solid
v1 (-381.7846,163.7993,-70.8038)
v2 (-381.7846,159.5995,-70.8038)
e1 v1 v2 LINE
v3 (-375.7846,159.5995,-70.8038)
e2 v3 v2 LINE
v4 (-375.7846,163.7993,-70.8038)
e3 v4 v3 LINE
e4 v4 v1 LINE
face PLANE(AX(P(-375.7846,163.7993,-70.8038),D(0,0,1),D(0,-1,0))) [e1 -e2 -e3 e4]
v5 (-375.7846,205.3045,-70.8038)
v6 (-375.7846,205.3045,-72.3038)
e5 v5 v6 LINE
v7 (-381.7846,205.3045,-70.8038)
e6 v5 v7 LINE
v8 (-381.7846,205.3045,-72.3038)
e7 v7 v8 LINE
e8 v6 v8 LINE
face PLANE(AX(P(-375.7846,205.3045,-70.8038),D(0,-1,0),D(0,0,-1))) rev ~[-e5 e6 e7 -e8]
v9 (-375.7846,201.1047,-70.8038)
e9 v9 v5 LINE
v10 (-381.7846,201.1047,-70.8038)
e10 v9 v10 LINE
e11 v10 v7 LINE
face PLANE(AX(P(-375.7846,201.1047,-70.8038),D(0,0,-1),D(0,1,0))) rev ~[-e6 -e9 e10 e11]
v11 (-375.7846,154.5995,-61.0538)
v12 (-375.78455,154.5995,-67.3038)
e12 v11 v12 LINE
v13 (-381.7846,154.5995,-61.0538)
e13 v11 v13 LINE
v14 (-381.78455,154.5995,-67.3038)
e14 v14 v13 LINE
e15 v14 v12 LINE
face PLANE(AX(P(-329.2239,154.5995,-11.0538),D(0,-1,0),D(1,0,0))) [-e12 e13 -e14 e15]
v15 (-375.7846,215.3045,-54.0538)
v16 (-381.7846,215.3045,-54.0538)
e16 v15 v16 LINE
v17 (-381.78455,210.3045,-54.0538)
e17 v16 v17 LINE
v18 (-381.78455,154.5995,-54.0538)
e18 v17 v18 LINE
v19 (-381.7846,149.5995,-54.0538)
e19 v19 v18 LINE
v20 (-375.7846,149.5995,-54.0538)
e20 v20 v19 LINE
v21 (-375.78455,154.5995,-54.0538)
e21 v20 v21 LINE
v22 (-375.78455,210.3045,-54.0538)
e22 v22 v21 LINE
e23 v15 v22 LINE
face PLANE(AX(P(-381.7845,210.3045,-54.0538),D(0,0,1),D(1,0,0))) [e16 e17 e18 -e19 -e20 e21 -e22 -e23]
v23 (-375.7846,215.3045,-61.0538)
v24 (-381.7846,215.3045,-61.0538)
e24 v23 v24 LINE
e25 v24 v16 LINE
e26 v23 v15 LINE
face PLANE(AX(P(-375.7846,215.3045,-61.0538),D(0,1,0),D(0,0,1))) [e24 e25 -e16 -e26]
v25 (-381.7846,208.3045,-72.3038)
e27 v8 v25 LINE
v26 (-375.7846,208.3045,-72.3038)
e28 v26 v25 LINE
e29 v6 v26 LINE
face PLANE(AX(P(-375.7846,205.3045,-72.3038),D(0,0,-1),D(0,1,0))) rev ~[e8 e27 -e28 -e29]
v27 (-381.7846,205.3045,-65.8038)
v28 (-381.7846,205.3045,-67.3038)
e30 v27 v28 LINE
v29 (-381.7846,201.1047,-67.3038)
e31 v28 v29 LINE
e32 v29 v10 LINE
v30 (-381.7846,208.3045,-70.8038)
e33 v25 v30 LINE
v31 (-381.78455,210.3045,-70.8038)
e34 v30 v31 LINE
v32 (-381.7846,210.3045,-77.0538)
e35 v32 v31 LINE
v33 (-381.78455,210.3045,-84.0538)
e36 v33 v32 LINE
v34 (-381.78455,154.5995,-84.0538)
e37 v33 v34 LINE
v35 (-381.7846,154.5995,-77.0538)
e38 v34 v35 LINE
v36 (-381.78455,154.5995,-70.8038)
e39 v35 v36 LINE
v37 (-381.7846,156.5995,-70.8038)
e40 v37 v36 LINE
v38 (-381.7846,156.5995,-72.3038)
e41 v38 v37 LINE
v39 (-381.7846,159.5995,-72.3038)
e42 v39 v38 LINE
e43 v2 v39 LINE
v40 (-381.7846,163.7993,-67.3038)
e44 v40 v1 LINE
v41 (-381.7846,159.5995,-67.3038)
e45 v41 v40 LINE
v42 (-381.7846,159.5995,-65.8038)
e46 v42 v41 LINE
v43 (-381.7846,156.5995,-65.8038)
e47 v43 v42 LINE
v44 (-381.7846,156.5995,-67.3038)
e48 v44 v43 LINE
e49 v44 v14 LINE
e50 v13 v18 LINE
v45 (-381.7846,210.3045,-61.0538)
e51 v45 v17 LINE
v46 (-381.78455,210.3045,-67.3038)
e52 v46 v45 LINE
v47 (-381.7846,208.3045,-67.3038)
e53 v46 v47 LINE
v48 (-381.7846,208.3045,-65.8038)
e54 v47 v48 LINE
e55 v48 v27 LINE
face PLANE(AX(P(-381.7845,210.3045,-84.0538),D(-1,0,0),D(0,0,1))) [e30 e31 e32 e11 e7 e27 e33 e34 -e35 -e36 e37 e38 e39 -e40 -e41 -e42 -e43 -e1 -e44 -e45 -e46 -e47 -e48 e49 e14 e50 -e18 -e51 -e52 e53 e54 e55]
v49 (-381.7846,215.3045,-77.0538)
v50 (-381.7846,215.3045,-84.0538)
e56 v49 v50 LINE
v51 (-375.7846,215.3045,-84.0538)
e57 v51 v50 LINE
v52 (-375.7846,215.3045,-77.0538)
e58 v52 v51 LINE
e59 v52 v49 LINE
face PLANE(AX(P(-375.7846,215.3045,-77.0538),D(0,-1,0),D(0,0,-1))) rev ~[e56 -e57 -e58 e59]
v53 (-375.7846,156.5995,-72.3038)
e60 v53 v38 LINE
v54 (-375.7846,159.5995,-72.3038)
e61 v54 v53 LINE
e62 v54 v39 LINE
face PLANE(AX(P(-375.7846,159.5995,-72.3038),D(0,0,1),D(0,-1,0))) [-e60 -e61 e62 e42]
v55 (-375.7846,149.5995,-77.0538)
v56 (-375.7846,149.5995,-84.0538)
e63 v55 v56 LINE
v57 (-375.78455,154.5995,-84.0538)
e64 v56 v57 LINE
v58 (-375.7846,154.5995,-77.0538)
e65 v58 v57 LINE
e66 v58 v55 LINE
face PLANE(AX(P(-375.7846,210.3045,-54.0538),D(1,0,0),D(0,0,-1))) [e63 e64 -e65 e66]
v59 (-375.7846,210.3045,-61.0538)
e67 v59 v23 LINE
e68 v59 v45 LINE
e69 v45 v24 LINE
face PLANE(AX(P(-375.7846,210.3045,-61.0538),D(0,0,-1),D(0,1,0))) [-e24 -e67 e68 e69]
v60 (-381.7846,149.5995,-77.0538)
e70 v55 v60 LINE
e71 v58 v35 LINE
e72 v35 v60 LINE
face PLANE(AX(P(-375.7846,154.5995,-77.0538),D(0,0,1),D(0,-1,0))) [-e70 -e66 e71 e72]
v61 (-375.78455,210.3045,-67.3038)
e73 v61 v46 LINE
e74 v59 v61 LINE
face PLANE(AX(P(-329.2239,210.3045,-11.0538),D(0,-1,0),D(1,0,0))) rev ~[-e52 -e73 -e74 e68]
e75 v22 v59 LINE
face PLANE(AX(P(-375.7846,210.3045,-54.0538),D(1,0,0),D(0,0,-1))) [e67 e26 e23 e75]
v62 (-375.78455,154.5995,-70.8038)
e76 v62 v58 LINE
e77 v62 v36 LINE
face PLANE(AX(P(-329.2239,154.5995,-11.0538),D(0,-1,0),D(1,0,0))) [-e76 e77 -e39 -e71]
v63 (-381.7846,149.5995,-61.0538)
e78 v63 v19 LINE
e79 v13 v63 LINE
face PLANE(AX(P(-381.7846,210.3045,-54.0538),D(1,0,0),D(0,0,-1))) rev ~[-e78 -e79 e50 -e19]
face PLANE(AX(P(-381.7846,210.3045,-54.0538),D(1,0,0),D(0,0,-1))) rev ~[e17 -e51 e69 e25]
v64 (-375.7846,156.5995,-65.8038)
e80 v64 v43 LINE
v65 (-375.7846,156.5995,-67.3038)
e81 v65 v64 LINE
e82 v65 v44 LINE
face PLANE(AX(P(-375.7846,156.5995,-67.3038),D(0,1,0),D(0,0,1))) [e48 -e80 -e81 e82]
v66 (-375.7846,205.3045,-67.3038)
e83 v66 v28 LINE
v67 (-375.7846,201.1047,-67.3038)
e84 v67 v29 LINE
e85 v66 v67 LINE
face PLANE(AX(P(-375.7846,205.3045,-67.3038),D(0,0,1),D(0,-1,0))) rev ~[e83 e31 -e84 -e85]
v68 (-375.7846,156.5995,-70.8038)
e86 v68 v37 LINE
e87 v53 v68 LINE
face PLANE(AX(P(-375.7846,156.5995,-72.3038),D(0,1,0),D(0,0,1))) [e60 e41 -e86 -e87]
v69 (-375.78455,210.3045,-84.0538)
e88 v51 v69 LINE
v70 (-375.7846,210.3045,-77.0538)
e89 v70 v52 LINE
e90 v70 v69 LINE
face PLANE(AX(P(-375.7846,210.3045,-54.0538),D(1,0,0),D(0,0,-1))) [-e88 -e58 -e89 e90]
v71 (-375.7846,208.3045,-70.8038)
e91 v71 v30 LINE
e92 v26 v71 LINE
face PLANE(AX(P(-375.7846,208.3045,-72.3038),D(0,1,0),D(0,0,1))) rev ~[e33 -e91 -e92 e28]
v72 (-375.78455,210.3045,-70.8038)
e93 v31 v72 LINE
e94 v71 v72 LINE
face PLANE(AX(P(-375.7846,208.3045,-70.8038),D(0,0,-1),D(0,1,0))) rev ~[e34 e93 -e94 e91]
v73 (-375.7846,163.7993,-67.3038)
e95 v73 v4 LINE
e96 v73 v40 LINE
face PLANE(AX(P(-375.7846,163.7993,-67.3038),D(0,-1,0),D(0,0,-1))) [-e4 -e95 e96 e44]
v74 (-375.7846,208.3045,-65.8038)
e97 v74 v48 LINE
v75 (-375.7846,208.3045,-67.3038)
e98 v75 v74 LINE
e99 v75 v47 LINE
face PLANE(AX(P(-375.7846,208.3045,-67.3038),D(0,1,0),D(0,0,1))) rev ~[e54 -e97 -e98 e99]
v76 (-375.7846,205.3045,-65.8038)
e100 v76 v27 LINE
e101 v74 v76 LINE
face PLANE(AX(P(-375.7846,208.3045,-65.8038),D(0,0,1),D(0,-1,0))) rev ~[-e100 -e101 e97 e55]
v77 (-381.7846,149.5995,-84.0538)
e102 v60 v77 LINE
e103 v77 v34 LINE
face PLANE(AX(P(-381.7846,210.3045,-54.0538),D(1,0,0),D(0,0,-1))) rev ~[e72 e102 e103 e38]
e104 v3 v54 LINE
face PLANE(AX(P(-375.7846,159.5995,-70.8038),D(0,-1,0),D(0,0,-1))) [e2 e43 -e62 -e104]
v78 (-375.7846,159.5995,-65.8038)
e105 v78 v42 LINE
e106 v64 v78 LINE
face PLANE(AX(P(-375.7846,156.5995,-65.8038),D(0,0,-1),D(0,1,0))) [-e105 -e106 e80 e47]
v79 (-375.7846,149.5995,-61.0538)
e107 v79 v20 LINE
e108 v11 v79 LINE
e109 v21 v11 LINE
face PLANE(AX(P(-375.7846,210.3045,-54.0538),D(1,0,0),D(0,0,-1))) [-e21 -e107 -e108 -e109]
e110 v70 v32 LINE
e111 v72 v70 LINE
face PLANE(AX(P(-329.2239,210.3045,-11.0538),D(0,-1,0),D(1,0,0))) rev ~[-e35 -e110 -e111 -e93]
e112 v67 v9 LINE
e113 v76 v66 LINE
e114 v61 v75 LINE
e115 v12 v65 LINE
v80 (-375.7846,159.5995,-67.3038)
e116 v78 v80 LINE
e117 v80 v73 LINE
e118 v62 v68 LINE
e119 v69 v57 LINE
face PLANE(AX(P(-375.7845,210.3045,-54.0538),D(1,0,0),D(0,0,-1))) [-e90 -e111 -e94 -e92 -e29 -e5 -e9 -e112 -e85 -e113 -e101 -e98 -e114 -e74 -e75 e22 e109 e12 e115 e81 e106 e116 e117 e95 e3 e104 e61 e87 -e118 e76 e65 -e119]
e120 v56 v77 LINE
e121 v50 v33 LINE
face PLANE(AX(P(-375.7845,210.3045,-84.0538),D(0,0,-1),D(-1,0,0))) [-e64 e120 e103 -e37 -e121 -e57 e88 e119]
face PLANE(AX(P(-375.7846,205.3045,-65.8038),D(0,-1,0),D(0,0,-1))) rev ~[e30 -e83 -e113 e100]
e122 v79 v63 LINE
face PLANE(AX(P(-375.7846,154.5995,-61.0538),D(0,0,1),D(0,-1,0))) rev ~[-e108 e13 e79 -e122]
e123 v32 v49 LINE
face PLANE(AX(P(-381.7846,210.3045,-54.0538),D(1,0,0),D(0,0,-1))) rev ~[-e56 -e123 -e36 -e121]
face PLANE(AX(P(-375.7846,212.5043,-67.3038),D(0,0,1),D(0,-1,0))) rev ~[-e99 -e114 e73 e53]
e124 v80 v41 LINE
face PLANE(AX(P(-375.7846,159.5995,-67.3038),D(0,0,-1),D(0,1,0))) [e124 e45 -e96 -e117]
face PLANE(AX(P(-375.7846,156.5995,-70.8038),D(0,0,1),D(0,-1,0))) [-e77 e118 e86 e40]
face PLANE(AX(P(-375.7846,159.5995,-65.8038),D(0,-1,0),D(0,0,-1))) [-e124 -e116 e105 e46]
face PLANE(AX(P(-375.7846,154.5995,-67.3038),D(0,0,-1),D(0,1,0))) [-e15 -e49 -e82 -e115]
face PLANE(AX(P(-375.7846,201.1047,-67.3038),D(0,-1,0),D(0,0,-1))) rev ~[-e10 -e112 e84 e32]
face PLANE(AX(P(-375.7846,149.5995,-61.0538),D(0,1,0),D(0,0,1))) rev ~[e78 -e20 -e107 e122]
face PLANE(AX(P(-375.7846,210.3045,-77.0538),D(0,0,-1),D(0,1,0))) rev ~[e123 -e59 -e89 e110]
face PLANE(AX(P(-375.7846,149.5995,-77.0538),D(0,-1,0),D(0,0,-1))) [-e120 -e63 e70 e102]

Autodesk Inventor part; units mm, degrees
ref_plane "YZ Plane" through (0, 0, 0) normal (1, 0, 0) x (0, 1, 0)
ref_plane "XZ Plane" through (0, 0, 0) normal (0, 1, 0) x (-1, 0, 0)
ref_plane "РабПлоскость1" through (-329.2239, 210.3045, -11.0538) normal (0, -1, 0) x (1, 0, 0)
sketch "Эскиз1" plane through (-329.2239, 210.3045, -11.0538) normal (0, -1, 0) x (1, 0, 0)
  line L0 (-46.5606, -73) -> (-52.5606, -73)
  line L1 (-52.5606, -73) -> (-52.5606, -43)
  line L2 (-52.5606, -43) -> (-46.5606, -43)
  line L3 (-46.5606, -43) -> (-46.5606, -73)
  line L4 (-23.55, -78) -> (-51.55, -78) projected
  point P0 (329.2239, 11.0538)
  dimension "d0" = 6
  dimension "d1" = 30
  dimension "d2" = 5
ref_plane "РабПлоскость2" through (-464.2239, 154.5996, -124.0538) normal (0, 1, 0) x (0, 0, 1)
extrude "Выдавливание1" add sketch "Эскиз1" along normal up to surface (55.705 mm away)
sketch "Эскиз2" plane through (-375.7846, 210.3045, -54.0538) normal (1, 0, 0) x (0, 0, -1)
  line L0 (0, -55.705) -> (30, -55.705) projected
  line L1 (30, -55.705) -> (23, -55.705)
  line L2 (23, -55.705) -> (23, -60.705)
  line L3 (23, -60.705) -> (30, -60.705)
  line L4 (30, -60.705) -> (30, -55.705)
  line L5 (0, -55.705) -> (7, -55.705)
  line L6 (7, -55.705) -> (7, -60.705)
  line L7 (7, -60.705) -> (0, -60.705)
  line L8 (0, -60.705) -> (0, -55.705)
  line L9 (18.25, -53.705) -> (11.75, -53.705)
  line L10 (11.75, -53.705) -> (11.75, -50.705)
  line L11 (11.75, -50.705) -> (18.25, -50.705)
  line L12 (18.25, -50.705) -> (18.25, -53.705)
  line L13 (13.25, -46.5052) -> (16.75, -46.5052)
  line L14 (16.75, -46.5052) -> (16.75, -57.9047)
  line L15 (16.75, -57.9047) -> (13.25, -57.9047)
  line L16 (13.25, -57.9047) -> (13.25, -46.5052)
  line L17 (13.25, -46.5052) -> (16.75, -57.9047) construction
  line L18 (16.75, -46.5052) -> (13.25, -57.9047) construction
  line L19 (30, 0) -> (30, -55.705) projected
  line L20 (30, -27.8525) -> (0, -27.8525)
  line L21 (0, 0) -> (0, -55.705) projected
  line L22 (30, 0) -> (23, 0)
  line L23 (23, 0) -> (23, 5)
  line L24 (23, 5) -> (30, 5)
  line L25 (30, 5) -> (30, 0)
  line L26 (0, 0) -> (7, 0)
  line L27 (7, 0) -> (7, 5)
  line L28 (7, 5) -> (0, 5)
  line L29 (0, 5) -> (0, 0)
  line L30 (18.25, -2) -> (11.75, -2)
  line L31 (11.75, -2) -> (11.75, -5)
  line L32 (11.75, -5) -> (18.25, -5)
  line L33 (18.25, -5) -> (18.25, -2)
  line L34 (13.25, -9.1998) -> (16.75, -9.1998)
  line L35 (16.75, -9.1998) -> (16.75, 2.1998)
  line L36 (16.75, 2.1998) -> (13.25, 2.1998)
  line L37 (13.25, 2.1998) -> (13.25, -9.1998)
  line L38 (13.25, -9.1998) -> (16.75, 2.1998) construction
  line L39 (16.75, -9.1998) -> (13.25, 2.1998) construction
  point P0 (-54.0538, -210.3045)
  point P1 (15, -52.205)
  point P2 (7, -55.705)
  point P3 (23, -55.705)
  point P4 (16.75, -53.705)
  point P5 (16.75, -50.705)
  point P6 (13.25, -50.705)
  point P7 (13.25, -53.705)
  point P8 (15, -3.5)
  point P9 (16.75, -5)
  point P10 (16.75, -2)
  point P11 (13.25, -2)
  point P12 (13.25, -5)
  dimension "d2" = 5
  dimension "d13" = 6.5
  dimension "d14" = 3
  dimension "d15" = 5
  dimension "d16" = 7
  dimension "d17" = 4.75
  dimension "d18" = 2
  dimension "d19" = 3.5
  dimension "d20" = 3.25
  dimension "d23" = 5
  dimension "d24" = 7
  dimension "d25" = 7
extrude "Выдавливание2" add sketch "Эскиз2" against normal blind 6 contours L0 L6 L7 L8 | L4 L3 L2 L0 | L22 L23 L24 L25 | L29 L28 L27 L26
sketch "Эскиз3" plane through (-375.7846, 154.5996, -84.0538) normal (1, 0, 0) x (0, 0, -1)
  point P0 (-84.0538, -154.5996)
extrude "Выдавливание3" cut sketch "Эскиз2" against normal blind 6 contours L16 L9 L14 L0 | L0 L14 L15 L16 | L16 L11 L14 L9 | L9 L10 L11 L16 | L14 L11 L12 L9 | L16 L13 L14 L11 | L33 L32 L35 L30 | L35 L32 L37 L30 | L30 L37 L36 L35 | L37 L32 L31 L30 | L35 L34 L37 L32
properties part number "стенка 2"
